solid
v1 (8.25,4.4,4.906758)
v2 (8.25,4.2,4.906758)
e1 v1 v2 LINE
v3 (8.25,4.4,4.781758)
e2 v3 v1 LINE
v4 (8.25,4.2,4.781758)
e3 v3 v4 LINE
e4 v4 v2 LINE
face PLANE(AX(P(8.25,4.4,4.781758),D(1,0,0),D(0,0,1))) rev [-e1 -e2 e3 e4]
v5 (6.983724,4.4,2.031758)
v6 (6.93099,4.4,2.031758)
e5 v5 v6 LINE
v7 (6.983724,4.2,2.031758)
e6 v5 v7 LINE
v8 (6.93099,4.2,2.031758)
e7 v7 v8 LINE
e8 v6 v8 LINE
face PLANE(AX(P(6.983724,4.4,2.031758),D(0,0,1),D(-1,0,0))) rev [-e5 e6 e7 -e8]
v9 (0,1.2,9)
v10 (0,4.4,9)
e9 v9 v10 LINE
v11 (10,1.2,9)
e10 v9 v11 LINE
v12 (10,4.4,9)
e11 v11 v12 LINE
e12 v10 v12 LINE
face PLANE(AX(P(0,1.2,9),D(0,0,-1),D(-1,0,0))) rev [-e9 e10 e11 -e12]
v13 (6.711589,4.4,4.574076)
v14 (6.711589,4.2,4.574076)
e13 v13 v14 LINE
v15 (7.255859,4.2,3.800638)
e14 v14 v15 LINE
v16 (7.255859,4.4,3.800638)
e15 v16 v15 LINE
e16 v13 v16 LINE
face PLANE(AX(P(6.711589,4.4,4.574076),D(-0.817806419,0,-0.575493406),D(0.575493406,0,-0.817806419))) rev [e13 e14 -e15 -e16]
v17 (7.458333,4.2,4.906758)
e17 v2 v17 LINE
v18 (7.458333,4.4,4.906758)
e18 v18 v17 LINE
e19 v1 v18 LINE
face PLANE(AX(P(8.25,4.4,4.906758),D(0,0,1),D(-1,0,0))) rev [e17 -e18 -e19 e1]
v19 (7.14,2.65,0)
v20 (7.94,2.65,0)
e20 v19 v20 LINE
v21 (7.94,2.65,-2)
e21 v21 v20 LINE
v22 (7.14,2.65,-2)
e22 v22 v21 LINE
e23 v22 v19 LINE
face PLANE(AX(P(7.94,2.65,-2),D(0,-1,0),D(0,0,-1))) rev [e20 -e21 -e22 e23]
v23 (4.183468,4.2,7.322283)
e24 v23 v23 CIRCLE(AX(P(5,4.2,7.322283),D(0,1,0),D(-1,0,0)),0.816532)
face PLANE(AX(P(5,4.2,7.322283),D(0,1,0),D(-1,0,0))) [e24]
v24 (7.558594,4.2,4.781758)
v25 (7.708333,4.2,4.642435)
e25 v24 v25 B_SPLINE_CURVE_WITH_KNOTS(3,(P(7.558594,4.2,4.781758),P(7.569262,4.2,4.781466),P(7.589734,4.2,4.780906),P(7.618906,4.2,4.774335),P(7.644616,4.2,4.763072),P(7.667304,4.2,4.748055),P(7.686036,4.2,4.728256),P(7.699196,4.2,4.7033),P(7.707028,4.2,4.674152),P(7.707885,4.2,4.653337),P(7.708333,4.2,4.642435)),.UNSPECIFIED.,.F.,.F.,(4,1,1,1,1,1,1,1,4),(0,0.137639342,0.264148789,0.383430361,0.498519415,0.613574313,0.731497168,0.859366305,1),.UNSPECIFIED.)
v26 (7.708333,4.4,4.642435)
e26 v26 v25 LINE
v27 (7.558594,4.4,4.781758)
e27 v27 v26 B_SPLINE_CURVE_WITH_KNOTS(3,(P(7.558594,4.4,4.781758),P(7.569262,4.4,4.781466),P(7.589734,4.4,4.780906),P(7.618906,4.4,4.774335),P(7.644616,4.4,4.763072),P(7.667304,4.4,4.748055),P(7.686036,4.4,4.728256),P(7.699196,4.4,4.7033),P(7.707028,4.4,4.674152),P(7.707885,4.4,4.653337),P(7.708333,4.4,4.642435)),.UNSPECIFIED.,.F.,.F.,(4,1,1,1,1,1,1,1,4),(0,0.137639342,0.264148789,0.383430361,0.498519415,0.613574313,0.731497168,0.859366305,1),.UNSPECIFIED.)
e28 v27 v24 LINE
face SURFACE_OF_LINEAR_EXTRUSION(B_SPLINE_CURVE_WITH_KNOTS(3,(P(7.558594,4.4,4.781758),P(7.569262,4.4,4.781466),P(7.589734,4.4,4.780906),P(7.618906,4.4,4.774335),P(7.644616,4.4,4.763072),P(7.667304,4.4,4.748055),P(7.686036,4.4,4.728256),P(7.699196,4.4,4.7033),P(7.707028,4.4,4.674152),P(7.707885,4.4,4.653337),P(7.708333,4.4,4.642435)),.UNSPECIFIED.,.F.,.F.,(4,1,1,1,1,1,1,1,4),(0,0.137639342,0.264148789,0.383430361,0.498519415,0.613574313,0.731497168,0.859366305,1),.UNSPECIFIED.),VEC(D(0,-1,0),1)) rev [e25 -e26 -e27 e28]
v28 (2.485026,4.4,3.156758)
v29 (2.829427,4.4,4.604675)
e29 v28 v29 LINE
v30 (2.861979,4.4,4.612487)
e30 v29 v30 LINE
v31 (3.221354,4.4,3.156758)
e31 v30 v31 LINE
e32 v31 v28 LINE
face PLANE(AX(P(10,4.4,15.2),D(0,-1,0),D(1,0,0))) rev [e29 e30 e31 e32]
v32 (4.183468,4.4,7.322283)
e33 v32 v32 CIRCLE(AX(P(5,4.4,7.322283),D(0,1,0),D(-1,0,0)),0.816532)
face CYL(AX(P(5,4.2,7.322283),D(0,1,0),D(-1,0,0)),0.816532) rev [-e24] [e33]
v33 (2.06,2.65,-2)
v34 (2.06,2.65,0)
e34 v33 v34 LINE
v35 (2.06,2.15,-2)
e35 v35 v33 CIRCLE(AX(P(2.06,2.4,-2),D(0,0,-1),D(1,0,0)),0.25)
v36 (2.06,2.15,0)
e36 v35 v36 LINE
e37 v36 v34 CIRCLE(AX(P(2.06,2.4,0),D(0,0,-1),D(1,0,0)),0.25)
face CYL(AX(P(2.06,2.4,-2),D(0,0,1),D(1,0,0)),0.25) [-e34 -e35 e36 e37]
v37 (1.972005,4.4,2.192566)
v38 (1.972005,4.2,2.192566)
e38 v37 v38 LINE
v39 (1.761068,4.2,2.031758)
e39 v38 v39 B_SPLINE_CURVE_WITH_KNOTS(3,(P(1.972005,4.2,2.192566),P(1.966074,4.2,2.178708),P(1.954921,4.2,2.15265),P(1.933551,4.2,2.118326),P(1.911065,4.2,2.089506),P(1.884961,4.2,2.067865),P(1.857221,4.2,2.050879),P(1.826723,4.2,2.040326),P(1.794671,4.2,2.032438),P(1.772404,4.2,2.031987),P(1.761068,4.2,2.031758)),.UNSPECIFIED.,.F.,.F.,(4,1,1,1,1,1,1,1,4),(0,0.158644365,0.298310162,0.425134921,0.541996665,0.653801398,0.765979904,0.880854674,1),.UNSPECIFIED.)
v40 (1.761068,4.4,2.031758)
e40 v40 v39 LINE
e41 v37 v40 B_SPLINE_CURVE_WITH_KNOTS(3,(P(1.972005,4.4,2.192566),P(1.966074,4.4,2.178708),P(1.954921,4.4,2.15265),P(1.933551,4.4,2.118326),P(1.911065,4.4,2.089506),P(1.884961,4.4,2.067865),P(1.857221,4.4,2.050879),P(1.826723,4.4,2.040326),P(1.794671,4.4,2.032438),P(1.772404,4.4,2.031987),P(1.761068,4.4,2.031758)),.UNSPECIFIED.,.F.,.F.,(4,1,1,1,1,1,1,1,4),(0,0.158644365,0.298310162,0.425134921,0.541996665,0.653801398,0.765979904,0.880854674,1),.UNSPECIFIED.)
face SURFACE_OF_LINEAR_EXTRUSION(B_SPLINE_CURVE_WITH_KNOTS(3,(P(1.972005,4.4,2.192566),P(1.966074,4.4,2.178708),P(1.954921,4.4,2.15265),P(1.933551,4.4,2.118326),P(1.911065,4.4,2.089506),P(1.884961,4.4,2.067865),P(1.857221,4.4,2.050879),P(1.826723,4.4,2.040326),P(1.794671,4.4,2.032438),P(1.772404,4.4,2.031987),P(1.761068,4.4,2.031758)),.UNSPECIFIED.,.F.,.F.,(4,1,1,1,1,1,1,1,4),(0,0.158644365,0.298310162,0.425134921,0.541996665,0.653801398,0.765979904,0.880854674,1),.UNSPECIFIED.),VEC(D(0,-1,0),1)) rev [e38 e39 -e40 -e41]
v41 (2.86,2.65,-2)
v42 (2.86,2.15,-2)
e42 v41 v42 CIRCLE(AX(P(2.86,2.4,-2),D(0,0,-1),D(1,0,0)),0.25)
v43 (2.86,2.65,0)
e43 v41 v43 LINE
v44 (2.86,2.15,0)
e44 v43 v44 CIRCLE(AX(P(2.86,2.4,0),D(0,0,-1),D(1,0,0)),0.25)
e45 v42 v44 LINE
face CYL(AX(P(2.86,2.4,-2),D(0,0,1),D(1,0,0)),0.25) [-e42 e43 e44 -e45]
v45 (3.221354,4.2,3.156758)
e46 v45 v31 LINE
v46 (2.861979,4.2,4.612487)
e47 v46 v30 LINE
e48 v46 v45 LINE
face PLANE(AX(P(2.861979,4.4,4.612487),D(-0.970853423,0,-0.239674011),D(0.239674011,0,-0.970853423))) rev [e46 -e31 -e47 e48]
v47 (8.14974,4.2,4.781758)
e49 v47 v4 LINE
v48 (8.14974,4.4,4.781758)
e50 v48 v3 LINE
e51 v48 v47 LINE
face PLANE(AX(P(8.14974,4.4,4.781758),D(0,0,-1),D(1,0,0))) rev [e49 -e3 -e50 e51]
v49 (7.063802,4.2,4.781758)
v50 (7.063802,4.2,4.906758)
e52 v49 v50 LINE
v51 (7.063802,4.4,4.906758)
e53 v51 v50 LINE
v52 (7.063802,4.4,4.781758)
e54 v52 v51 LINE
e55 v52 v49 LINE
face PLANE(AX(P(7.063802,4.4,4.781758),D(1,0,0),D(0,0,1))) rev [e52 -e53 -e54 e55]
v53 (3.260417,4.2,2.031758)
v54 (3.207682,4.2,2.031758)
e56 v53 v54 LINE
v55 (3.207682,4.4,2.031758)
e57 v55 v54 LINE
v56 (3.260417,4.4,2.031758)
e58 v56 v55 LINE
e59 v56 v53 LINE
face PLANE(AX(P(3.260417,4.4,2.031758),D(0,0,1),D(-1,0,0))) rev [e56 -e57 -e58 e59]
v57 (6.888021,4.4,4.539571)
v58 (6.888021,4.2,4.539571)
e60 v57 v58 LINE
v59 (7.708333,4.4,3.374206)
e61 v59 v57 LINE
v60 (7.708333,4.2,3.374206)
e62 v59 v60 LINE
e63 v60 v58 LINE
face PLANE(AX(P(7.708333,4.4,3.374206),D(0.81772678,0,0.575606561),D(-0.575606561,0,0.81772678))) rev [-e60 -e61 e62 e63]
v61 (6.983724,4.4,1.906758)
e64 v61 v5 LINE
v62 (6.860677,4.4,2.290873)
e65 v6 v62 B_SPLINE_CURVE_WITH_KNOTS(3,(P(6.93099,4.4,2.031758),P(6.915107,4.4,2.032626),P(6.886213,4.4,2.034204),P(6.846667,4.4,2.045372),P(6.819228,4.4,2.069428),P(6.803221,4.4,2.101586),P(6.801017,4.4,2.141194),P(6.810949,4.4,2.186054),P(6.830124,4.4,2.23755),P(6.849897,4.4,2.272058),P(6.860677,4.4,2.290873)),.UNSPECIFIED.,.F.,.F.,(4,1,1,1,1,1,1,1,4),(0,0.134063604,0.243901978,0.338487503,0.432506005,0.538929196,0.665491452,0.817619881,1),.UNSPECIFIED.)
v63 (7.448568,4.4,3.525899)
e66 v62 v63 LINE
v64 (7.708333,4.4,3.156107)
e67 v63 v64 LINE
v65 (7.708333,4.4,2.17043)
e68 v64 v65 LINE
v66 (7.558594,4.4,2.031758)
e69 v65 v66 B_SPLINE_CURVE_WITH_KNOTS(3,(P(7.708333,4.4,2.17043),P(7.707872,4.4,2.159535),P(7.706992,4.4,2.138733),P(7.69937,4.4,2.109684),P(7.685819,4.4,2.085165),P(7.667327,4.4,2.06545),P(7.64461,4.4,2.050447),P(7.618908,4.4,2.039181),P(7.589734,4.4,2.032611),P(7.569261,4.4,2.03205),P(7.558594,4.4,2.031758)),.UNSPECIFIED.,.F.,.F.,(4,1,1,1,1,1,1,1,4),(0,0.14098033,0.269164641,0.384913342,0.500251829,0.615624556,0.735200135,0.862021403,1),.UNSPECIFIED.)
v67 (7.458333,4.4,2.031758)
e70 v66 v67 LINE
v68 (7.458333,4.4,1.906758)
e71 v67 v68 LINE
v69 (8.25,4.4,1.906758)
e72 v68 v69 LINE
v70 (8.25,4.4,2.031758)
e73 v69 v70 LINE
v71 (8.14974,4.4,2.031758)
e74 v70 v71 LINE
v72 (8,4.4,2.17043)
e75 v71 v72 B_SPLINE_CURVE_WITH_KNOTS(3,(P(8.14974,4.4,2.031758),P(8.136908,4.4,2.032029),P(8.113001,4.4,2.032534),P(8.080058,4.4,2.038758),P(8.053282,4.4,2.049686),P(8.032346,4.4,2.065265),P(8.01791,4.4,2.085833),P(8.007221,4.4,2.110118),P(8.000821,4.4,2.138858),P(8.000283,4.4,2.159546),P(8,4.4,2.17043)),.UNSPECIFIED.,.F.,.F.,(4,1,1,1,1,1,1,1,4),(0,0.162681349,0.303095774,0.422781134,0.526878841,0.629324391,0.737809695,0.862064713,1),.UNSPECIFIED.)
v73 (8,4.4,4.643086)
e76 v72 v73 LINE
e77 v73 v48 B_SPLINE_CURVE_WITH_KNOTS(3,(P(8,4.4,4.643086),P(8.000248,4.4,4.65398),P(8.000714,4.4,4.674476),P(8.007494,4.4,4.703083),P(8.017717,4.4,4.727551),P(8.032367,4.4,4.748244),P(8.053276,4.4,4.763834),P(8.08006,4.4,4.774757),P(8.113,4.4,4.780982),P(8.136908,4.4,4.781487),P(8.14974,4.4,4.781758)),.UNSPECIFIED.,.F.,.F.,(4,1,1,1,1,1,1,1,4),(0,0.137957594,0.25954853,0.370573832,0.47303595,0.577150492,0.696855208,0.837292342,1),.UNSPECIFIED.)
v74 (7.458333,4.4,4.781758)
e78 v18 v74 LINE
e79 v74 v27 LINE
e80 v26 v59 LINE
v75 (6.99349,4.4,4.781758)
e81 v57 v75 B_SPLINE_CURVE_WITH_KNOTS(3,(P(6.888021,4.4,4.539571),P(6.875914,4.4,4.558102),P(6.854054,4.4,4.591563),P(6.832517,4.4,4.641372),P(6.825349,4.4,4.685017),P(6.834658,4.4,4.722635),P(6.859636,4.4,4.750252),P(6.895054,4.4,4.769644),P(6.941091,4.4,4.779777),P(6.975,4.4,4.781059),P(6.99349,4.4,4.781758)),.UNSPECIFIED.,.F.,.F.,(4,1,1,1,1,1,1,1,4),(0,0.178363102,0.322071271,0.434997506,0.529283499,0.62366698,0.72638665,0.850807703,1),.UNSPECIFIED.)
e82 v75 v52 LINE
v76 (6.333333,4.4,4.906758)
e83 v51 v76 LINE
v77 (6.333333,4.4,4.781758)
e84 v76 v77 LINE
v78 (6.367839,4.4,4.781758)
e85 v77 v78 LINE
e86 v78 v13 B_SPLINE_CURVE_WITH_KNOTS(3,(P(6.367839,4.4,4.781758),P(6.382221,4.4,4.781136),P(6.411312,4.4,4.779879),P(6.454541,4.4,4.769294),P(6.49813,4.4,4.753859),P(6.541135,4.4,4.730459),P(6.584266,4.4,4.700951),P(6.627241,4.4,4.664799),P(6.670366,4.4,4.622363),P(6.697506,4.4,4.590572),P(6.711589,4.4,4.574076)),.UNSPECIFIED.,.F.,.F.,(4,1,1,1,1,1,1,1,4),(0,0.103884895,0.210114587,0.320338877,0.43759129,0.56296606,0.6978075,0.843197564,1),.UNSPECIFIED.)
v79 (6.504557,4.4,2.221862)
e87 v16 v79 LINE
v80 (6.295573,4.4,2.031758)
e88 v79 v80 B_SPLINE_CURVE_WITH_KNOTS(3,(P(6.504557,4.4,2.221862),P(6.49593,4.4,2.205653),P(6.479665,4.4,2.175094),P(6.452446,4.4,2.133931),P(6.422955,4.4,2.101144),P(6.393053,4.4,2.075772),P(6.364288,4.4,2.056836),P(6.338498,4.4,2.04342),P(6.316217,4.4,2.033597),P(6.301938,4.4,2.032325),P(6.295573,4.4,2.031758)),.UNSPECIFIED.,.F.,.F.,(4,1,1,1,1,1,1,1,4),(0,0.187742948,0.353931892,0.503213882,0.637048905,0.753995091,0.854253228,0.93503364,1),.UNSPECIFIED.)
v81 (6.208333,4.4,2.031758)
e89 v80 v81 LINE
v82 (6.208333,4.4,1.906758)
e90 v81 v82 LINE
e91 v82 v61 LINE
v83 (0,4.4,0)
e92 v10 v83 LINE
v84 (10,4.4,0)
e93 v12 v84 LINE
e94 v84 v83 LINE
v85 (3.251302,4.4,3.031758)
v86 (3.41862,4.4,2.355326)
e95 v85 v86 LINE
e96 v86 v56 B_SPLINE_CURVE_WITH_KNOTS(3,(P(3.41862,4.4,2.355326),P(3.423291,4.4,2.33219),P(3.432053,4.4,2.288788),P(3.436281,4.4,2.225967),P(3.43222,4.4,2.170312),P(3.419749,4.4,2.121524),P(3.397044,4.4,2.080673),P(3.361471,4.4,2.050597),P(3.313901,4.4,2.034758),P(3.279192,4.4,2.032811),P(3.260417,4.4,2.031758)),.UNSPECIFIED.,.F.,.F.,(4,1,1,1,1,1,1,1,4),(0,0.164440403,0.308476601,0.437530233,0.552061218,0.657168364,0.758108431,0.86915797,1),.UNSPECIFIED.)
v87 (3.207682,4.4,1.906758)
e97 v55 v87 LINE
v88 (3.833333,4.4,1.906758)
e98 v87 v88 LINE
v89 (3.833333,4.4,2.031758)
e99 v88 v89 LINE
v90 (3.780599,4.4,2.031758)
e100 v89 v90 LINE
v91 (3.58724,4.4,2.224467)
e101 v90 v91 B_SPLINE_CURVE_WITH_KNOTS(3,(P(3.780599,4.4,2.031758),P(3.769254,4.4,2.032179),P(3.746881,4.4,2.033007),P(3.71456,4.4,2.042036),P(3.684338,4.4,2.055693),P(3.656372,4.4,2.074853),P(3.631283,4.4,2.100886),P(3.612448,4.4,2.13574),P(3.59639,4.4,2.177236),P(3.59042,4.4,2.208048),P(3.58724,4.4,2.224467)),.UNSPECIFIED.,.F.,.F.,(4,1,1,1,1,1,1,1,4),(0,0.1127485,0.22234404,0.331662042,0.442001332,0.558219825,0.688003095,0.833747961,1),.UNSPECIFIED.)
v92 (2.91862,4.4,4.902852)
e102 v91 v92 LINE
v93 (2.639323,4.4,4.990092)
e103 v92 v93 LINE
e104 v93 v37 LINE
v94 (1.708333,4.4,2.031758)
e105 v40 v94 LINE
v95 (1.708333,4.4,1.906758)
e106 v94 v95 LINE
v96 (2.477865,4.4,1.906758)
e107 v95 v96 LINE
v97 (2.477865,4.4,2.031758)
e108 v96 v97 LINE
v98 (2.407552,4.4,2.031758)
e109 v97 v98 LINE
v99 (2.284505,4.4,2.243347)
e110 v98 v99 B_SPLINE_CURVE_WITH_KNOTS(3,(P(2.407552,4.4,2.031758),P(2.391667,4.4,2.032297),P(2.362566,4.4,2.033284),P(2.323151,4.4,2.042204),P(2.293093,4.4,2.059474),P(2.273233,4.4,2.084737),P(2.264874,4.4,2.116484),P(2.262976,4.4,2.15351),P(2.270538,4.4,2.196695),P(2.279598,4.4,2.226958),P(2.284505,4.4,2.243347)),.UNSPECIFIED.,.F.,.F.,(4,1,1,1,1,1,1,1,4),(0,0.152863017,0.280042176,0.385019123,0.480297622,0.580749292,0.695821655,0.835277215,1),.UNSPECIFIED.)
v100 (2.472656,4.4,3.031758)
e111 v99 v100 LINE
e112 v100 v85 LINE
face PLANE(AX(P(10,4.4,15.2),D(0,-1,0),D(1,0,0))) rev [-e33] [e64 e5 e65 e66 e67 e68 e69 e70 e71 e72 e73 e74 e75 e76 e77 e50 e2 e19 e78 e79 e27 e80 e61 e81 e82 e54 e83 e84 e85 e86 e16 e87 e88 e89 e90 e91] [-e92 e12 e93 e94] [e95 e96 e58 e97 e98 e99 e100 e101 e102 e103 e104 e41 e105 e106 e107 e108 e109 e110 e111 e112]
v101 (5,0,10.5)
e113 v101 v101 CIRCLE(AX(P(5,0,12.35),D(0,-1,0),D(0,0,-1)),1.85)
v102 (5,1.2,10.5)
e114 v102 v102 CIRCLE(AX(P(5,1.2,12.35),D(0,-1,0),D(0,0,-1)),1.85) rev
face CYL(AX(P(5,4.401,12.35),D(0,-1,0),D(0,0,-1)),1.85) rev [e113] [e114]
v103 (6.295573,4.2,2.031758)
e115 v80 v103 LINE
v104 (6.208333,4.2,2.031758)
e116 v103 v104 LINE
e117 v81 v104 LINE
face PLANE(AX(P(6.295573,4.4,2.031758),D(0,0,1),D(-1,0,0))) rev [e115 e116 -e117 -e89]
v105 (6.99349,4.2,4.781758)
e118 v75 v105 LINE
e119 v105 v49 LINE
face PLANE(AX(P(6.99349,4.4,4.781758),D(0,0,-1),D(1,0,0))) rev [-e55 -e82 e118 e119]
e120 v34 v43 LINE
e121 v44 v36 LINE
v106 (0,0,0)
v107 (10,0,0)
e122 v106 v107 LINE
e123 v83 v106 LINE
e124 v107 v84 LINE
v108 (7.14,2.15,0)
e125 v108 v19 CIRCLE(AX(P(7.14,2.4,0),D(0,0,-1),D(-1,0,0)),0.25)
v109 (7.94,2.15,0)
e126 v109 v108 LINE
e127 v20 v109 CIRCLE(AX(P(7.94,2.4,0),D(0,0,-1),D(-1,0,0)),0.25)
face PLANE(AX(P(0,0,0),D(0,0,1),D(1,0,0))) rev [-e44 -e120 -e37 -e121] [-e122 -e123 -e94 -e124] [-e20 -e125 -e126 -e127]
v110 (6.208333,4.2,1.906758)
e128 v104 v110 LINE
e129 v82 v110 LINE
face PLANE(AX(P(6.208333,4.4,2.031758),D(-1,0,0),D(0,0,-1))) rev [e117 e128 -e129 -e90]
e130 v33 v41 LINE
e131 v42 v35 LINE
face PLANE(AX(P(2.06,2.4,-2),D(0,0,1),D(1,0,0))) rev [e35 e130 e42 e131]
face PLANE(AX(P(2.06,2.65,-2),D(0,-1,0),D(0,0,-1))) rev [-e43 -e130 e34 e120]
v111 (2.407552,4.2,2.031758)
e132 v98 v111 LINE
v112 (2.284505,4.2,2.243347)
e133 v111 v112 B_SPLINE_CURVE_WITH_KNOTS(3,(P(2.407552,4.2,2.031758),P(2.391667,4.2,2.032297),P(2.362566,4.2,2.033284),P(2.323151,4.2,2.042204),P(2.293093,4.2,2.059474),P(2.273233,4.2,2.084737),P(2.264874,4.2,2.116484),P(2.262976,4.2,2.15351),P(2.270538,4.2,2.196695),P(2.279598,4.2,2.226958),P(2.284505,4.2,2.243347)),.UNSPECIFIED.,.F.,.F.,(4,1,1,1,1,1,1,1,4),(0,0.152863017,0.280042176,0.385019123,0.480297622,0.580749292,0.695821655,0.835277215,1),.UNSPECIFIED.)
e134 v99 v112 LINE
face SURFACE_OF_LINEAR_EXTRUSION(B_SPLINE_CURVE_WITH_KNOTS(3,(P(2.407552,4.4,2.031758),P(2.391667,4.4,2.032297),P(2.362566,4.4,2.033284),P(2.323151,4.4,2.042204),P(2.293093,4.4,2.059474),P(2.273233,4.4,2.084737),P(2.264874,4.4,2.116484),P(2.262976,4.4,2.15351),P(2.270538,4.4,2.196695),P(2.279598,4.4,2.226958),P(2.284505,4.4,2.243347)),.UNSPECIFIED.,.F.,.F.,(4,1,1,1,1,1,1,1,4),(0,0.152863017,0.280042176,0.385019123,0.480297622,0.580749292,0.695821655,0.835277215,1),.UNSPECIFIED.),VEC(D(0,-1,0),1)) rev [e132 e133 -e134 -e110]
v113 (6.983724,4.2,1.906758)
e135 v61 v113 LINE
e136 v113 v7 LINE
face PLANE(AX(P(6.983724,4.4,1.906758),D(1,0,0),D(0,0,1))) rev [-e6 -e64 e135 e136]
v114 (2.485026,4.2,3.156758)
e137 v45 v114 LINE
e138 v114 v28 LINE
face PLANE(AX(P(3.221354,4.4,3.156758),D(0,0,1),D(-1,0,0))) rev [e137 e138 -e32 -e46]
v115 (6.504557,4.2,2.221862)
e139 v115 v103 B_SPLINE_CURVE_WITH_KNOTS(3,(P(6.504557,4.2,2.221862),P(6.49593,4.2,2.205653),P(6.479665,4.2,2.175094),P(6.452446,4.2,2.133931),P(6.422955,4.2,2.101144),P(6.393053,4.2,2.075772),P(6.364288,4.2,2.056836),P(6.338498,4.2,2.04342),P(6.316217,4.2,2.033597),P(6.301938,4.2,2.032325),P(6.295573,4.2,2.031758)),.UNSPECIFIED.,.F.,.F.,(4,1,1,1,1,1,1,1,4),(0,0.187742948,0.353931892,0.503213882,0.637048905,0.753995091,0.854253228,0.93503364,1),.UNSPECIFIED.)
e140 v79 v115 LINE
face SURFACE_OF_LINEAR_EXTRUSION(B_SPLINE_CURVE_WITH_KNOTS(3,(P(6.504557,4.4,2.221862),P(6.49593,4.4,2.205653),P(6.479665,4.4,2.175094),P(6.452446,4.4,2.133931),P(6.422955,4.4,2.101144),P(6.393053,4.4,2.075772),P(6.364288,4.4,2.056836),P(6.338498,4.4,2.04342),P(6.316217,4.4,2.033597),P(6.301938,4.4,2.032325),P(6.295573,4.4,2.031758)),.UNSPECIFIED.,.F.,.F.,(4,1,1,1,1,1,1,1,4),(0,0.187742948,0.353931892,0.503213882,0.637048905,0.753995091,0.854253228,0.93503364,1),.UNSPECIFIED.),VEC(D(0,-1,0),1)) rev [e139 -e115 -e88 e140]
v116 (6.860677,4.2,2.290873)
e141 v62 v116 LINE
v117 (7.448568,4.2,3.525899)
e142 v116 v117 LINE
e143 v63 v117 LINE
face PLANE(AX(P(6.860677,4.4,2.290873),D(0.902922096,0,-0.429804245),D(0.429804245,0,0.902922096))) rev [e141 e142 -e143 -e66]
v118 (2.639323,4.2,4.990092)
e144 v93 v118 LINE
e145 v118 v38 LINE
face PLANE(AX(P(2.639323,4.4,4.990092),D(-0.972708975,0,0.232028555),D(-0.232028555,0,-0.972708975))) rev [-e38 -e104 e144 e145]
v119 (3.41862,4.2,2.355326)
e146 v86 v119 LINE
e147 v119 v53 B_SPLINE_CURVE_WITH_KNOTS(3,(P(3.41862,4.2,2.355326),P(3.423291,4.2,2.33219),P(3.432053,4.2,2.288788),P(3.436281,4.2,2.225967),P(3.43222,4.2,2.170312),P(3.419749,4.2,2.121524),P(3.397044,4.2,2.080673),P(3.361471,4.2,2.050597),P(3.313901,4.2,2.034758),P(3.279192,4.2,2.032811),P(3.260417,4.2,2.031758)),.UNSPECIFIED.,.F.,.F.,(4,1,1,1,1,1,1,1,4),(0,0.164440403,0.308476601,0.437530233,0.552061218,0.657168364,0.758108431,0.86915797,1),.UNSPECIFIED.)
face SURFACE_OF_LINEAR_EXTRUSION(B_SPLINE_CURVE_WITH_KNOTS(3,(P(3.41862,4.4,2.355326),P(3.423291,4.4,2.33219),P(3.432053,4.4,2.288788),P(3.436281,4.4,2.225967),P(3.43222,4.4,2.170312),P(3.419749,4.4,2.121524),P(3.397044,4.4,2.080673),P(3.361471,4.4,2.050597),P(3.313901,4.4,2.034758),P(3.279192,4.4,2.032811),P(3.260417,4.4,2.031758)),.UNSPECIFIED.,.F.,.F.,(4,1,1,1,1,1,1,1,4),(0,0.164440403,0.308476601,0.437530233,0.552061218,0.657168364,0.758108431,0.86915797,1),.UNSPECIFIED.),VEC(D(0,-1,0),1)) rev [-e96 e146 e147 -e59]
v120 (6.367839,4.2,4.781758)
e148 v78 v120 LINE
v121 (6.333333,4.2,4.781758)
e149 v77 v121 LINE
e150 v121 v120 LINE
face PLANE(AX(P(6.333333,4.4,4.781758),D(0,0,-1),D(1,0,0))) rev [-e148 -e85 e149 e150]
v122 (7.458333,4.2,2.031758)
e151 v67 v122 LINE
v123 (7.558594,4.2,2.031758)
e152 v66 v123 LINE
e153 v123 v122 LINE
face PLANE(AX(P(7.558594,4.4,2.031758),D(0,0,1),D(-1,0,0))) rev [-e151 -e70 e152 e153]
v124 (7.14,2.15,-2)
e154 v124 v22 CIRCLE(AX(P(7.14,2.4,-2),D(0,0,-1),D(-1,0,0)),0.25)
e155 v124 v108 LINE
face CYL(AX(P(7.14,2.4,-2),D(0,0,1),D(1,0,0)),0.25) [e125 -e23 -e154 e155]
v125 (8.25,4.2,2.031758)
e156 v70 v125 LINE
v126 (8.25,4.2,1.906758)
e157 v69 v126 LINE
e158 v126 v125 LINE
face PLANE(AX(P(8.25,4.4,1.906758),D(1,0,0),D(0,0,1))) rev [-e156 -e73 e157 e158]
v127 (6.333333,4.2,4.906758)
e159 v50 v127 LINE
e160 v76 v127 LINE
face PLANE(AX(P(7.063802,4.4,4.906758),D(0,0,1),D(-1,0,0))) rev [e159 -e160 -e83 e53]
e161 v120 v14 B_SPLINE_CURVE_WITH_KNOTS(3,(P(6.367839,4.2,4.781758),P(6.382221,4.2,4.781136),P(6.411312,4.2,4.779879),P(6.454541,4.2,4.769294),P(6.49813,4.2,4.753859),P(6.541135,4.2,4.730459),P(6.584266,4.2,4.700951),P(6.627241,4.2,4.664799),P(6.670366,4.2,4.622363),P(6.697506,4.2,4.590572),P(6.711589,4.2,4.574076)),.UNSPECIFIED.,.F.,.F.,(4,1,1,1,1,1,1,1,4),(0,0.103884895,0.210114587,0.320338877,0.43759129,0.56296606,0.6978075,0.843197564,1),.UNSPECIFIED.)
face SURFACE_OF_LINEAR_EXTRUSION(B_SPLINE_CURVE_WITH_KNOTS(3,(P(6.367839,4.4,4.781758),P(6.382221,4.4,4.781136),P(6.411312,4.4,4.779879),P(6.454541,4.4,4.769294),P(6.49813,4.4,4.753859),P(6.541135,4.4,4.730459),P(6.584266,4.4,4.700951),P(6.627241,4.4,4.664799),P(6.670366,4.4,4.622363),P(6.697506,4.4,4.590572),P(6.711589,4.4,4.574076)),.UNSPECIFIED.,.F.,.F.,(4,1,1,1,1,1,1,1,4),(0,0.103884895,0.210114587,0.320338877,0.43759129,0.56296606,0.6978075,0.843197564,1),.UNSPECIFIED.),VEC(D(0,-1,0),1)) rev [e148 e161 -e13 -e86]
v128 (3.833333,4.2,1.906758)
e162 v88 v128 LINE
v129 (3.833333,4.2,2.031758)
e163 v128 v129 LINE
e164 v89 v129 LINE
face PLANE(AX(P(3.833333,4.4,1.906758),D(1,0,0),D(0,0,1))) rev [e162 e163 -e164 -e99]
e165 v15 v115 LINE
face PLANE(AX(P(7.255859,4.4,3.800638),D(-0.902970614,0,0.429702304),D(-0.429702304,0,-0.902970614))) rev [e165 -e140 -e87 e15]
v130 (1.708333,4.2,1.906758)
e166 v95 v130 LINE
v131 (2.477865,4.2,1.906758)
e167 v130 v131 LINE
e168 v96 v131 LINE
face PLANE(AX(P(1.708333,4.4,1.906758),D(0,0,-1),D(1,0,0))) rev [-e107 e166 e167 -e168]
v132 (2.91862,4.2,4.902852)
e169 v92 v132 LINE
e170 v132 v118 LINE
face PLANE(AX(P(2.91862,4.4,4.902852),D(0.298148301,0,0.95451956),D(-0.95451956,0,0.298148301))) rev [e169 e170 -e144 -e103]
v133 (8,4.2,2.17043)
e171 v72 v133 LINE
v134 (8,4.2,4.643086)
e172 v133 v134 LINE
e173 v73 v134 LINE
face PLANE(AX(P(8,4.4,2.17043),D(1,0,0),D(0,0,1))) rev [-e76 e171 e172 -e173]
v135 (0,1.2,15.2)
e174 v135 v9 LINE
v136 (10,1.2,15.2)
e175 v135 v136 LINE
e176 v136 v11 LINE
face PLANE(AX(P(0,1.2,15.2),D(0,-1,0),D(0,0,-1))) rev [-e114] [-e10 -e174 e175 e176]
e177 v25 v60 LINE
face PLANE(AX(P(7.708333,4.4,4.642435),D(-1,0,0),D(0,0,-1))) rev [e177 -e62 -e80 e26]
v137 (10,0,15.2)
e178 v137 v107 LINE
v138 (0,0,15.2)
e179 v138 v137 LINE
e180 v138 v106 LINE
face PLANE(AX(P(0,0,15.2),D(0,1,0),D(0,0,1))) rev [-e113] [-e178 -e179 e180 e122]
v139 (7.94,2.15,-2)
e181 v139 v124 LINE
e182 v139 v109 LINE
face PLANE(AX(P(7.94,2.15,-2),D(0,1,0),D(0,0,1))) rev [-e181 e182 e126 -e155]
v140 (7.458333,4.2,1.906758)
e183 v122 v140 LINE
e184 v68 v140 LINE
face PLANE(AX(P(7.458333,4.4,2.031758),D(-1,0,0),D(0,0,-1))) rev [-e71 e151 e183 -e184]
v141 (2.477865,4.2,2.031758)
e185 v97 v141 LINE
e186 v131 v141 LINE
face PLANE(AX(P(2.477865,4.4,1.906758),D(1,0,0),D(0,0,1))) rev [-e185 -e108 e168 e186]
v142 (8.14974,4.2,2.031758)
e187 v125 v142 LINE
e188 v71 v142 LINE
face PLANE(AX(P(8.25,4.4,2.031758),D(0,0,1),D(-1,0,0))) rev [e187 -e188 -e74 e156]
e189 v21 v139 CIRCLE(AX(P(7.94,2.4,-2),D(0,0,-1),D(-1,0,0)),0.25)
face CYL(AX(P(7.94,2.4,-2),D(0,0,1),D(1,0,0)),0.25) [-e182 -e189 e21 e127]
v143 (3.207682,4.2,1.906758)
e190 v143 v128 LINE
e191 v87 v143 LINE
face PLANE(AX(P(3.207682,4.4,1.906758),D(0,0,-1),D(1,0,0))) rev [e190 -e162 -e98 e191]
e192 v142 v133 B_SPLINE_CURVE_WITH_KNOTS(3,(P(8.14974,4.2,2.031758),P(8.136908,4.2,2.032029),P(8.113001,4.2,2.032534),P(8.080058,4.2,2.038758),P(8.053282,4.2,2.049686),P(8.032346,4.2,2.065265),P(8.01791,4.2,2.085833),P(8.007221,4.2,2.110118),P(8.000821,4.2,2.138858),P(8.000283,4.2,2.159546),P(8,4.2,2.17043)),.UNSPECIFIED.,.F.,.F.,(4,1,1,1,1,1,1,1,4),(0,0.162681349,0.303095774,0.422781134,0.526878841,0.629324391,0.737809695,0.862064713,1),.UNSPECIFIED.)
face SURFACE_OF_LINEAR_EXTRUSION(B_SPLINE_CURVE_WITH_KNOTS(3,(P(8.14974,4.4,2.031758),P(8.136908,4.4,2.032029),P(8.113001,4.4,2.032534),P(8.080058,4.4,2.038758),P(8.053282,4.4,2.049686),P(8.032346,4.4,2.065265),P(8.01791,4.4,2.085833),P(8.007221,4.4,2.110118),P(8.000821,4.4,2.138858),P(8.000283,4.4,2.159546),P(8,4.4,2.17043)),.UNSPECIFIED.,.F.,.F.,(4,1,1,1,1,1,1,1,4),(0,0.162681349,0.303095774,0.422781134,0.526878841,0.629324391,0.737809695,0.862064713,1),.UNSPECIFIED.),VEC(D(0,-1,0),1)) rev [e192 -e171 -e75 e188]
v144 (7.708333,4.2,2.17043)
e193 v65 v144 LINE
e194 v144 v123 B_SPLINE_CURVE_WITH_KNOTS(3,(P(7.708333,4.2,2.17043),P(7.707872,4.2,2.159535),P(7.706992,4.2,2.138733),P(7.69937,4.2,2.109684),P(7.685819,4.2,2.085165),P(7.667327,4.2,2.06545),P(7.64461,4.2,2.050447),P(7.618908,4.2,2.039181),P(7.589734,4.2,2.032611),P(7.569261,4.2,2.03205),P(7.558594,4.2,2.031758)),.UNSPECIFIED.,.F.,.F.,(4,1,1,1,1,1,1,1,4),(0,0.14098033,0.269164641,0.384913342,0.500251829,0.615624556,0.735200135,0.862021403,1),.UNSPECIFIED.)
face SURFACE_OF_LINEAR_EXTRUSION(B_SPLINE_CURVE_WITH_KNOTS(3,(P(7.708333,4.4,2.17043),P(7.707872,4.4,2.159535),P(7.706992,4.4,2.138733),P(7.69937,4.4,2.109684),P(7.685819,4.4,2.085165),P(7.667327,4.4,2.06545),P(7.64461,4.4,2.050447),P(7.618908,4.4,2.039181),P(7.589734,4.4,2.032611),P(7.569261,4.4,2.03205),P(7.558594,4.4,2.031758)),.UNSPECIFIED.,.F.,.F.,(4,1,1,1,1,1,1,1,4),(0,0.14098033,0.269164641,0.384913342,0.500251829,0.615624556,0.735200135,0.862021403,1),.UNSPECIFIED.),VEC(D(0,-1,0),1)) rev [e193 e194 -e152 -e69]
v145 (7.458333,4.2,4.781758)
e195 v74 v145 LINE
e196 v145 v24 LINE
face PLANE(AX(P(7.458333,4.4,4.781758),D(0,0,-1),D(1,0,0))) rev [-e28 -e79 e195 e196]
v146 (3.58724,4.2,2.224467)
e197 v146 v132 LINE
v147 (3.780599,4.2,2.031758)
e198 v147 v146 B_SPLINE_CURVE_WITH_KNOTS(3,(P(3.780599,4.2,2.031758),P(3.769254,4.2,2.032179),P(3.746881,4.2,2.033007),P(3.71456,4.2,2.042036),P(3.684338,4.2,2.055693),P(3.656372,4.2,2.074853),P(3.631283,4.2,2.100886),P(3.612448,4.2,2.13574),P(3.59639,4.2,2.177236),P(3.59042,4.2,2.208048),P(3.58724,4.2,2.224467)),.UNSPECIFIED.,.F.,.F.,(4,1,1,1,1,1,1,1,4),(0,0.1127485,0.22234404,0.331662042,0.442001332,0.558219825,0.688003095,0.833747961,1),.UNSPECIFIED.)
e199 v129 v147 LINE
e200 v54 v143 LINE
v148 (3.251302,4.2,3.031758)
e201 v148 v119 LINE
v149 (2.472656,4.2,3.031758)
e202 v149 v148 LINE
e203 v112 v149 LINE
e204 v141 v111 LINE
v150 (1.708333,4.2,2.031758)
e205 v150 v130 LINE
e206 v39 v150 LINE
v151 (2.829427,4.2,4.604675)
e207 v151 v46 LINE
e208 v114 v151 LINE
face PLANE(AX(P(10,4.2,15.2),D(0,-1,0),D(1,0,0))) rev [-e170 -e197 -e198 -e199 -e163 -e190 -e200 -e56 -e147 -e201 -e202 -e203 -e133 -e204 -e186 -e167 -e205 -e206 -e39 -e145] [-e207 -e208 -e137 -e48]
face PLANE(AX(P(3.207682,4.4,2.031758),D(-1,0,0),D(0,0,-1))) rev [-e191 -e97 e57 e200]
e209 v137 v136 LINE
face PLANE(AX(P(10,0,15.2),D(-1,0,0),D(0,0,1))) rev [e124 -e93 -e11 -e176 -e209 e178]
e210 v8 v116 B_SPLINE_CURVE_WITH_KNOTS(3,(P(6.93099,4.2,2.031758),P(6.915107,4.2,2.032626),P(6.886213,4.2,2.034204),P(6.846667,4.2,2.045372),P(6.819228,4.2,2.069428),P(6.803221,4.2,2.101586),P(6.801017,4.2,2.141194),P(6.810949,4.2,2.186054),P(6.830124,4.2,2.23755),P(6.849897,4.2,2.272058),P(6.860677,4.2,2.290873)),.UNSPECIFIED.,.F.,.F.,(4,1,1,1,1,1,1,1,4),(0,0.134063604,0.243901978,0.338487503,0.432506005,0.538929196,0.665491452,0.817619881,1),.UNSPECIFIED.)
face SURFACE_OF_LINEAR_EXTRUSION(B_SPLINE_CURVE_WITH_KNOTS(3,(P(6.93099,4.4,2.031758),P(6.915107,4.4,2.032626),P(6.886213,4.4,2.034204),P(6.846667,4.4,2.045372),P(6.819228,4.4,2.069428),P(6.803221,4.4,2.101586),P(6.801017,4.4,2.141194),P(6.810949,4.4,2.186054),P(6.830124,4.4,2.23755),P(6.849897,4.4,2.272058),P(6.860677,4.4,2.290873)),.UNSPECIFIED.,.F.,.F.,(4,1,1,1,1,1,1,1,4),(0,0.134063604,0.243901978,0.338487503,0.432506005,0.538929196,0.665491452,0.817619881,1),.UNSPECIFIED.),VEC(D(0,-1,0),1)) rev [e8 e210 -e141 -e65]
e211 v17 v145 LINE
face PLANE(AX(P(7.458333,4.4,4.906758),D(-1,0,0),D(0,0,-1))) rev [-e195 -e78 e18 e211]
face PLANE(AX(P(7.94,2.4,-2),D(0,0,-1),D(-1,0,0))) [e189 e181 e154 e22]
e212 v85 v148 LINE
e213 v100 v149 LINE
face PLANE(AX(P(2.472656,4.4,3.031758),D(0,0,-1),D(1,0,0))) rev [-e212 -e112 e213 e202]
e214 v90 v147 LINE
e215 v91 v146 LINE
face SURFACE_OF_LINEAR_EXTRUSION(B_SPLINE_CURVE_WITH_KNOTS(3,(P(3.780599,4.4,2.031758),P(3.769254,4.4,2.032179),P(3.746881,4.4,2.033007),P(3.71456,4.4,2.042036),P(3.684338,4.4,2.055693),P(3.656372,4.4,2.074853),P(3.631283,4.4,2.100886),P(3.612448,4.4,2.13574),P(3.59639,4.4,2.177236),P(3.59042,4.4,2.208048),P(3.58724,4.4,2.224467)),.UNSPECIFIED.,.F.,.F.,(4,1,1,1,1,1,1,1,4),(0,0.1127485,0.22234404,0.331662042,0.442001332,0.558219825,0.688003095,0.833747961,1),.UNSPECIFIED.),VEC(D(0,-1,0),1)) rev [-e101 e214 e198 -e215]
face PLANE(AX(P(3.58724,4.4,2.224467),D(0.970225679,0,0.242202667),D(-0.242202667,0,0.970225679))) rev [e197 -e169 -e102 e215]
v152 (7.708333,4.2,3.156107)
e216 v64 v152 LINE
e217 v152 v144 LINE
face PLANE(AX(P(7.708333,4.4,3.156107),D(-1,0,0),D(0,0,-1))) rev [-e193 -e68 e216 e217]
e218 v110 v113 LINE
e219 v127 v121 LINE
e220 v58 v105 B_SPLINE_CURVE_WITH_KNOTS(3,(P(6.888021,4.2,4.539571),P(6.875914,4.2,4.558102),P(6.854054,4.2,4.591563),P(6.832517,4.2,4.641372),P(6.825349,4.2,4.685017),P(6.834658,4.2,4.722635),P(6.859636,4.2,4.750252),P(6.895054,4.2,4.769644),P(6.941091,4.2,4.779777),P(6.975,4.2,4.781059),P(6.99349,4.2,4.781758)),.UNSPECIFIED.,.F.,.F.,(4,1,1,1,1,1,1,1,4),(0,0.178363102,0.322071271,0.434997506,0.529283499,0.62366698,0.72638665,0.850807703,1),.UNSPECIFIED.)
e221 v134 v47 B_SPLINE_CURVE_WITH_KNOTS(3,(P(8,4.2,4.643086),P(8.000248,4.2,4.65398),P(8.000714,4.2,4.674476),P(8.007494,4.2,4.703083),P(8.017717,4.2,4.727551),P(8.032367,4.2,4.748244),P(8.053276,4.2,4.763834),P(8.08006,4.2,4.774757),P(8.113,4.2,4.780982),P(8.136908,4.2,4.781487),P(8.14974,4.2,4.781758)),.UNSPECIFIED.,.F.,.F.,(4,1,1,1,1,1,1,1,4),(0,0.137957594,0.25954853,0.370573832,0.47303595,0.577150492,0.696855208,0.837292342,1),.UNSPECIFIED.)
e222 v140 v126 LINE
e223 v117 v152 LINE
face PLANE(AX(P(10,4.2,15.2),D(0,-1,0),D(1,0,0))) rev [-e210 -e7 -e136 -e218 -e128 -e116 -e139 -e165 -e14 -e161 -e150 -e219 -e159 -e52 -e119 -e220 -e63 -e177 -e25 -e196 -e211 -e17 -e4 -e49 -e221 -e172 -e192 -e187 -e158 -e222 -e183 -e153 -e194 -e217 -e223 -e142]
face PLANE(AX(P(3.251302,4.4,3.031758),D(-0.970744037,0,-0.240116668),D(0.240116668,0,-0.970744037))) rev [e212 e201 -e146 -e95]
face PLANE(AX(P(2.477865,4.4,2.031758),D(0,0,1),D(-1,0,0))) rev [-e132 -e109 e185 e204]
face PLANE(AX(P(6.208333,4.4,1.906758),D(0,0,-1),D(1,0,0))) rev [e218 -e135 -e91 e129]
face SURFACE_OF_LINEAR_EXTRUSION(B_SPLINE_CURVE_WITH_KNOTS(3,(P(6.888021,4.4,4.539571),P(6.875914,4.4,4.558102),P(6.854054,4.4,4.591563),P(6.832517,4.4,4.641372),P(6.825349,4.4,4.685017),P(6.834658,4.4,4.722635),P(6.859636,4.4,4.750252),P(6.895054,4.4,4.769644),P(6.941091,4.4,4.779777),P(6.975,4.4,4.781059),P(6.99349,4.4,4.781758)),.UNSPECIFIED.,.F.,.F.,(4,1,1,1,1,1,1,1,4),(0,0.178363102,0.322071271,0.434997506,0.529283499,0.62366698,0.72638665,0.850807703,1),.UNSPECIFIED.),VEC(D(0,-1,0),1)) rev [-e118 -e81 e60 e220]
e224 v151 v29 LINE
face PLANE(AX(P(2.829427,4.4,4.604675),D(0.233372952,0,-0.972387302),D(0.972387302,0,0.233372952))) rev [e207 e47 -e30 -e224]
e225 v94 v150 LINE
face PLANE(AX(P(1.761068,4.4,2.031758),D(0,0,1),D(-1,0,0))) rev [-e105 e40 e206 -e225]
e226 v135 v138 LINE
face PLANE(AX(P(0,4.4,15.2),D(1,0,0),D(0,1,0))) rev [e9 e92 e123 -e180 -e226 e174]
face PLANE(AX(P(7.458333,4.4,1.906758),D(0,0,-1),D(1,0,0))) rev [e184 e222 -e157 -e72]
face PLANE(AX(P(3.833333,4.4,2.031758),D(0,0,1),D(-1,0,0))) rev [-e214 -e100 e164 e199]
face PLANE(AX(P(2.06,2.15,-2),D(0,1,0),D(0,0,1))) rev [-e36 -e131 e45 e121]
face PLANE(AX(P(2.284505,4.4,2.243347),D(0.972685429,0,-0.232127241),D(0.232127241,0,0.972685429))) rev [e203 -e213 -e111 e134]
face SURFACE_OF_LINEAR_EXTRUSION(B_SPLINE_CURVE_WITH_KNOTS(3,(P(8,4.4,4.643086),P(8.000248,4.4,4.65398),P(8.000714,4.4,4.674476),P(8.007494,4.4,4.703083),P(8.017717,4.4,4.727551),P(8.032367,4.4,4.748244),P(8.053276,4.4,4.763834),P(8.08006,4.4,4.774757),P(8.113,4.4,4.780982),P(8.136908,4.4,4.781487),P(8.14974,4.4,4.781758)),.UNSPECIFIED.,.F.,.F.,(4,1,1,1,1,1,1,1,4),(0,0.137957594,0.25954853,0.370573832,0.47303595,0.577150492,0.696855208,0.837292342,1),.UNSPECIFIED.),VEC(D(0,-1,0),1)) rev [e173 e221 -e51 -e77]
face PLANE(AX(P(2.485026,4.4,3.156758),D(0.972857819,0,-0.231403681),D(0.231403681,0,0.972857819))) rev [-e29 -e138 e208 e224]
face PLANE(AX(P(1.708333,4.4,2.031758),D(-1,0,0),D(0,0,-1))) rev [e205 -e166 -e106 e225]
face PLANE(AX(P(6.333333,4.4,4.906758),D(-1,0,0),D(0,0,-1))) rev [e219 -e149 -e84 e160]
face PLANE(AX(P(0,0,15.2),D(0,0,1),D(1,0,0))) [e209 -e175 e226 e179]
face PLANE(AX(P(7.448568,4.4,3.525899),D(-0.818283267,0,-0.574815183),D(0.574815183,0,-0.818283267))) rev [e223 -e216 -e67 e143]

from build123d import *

# Parameters (mm, degrees)
SKETCH_1_W          = 10
SKETCH_1_H          = 4.4
EXTRUDE_1_DEPTH     = 15.2
SKETCH_2_W          = 6.2
SKETCH_2_H          = 3.2
CUT_EXTRUDE_1_DEPTH = 19.718974331
CUT_EXTRUDE_2_REACH = 20.719
SKETCH_3_R          = 1.85
SKETCH_4_R          = 0.816532351
CUT_EXTRUDE_3_DEPTH = 0.2
EXTRUDE_2_DEPTH     = 2
WRAP_START          = -0.2
WRAP_1_DEPTH        = 0.2


# Read off the part's stored shape, not the designer's step: 包覆1
with BuildPart() as part:
    # 草图1 → 凸台-拉伸1 (new body)
    with BuildSketch(Plane.XY):
        with Locations((5, 2.2)):
            Rectangle(SKETCH_1_W, SKETCH_1_H)
    extrude(amount=EXTRUDE_1_DEPTH)

    # 草图2 → 切除-拉伸1 (cut, through all)
    with BuildSketch(Plane(origin=(10, 0, 0), x_dir=(0, 0, -1), z_dir=(1, 0, 0))):
        with Locations((-12.1, 2.8)):
            Rectangle(SKETCH_2_W, SKETCH_2_H)
    extrude(amount=-CUT_EXTRUDE_1_DEPTH, mode=Mode.SUBTRACT)

    # 草图3 → 切除-拉伸2 (cut, up to next)
    with BuildSketch(Plane.XZ, mode=Mode.PRIVATE) as cut_extrude_2_sk1:
        with Locations(Location((5, 12.35, 0), (0, 0, 270))):
            Circle(SKETCH_3_R)
    cut_extrude_2_tool1 = extrude(cut_extrude_2_sk1.sketch, amount=-CUT_EXTRUDE_2_REACH, mode=Mode.PRIVATE) & part.part
    add(cut_extrude_2_tool1.solids().sort_by_distance((5, 0, 12.35))[0], mode=Mode.SUBTRACT)

    # 草图4 → 切除-拉伸3 (cut)
    with BuildSketch(Plane(origin=(0, 4.4, 0), x_dir=(-1, 0, 0), z_dir=(0, 1, 0))):
        with Locations((-5, 7.32228291)):
            Circle(SKETCH_4_R)
    extrude(amount=-CUT_EXTRUDE_3_DEPTH, mode=Mode.SUBTRACT)

    # 草图5 → 凸台-拉伸2 (add)
    with BuildSketch(Plane(origin=(0, 0, 0), x_dir=(-1, 0, 0), z_dir=(0, 0, -1))):
        with BuildLine():
            Line((-7.94, 2.65), (-7.14, 2.65))
            ThreePointArc((-7.14, 2.65), (-6.89, 2.4), (-7.14, 2.15))
            Line((-7.14, 2.15), (-7.94, 2.15))
            ThreePointArc((-7.94, 2.15), (-8.19, 2.4), (-7.94, 2.65))
        make_face()
        with BuildLine():
            Line((-2.06, 2.65), (-2.86, 2.65))
            ThreePointArc((-2.86, 2.65), (-3.11, 2.4), (-2.86, 2.15))
            Line((-2.86, 2.15), (-2.06, 2.15))
            ThreePointArc((-2.06, 2.15), (-1.81, 2.4), (-2.06, 2.65))
        make_face()
    extrude(amount=EXTRUDE_2_DEPTH)

    # 包覆1 outline → 包覆1 (cut)
    # profile 1 of 2: a face of its own
    with BuildSketch(Plane(origin=(0, 4.4, 0), x_dir=(1, 0, 0), z_dir=(0, 1, 0)).offset(WRAP_START)):
        with BuildLine():
            add(Edge.make_bspline(
                [(6.930989583, -2.031758229), (6.915107326, -2.032625879), (6.886212727, -2.034204394), (6.846667333, -2.045372179), (6.819228063, -2.069428088), (6.803221049, -2.101586149), (6.801017387, -2.141193863), (6.810949266, -2.186053613), (6.830123901, -2.237549844), (6.849896632, -2.272058221), (6.860677083, -2.290872813)],
                knots=[0, 0, 0, 0, 0.134063604, 0.243901978, 0.338487503, 0.432506005, 0.538929196, 0.665491452, 0.817619881, 1, 1, 1, 1], degree=3))
            Line((6.930989583, -2.031758229), (6.983723958, -2.031758229))
            Line((6.983723958, -2.031758229), (6.983723958, -1.906758229))
            Line((6.983723958, -1.906758229), (6.208333333, -1.906758229))
            Line((6.208333333, -1.906758229), (6.208333333, -2.031758229))
            Line((6.208333333, -2.031758229), (6.295572917, -2.031758229))
            add(Edge.make_bspline(
                [(6.504557292, -2.221862396), (6.495929833, -2.205652704), (6.479665398, -2.175094288), (6.45244636, -2.133930793), (6.422954526, -2.101143884), (6.393052529, -2.075772209), (6.364287696, -2.056836396), (6.33849766, -2.04342026), (6.316216749, -2.033596626), (6.301937753, -2.032325038), (6.295572917, -2.031758229)],
                knots=[0, 0, 0, 0, 0.187742948, 0.353931892, 0.503213882, 0.637048905, 0.753995091, 0.854253228, 0.93503364, 1, 1, 1, 1], degree=3))
            Line((6.504557292, -2.221862396), (7.255859375, -3.800638438))
            Line((7.255859375, -3.800638438), (6.711588542, -4.574075938))
            add(Edge.make_bspline(
                [(6.367838542, -4.781758229), (6.382221439, -4.781136361), (6.411311872, -4.779878589), (6.454540631, -4.769294334), (6.498129706, -4.753858707), (6.541134976, -4.730459287), (6.584266179, -4.700950899), (6.627240555, -4.66479857), (6.670366285, -4.622362568), (6.697506142, -4.590571678), (6.711588542, -4.574075938)],
                knots=[0, 0, 0, 0, 0.103884895, 0.210114587, 0.320338877, 0.43759129, 0.56296606, 0.6978075, 0.843197564, 1, 1, 1, 1], degree=3))
            Line((6.367838542, -4.781758229), (6.333333333, -4.781758229))
            Line((6.333333333, -4.781758229), (6.333333333, -4.906758229))
            Line((6.333333333, -4.906758229), (7.063802083, -4.906758229))
            Line((7.063802083, -4.906758229), (7.063802083, -4.781758229))
            Line((7.063802083, -4.781758229), (6.993489583, -4.781758229))
            add(Edge.make_bspline(
                [(6.888020833, -4.539570729), (6.875914449, -4.558101633), (6.854053882, -4.591562992), (6.832516724, -4.641371555), (6.825349297, -4.68501694), (6.834657735, -4.72263487), (6.859636327, -4.75025169), (6.89505428, -4.769644136), (6.941090575, -4.779777335), (6.974999933, -4.781059246), (6.993489583, -4.781758229)],
                knots=[0, 0, 0, 0, 0.178363102, 0.322071271, 0.434997506, 0.529283499, 0.62366698, 0.72638665, 0.850807703, 1, 1, 1, 1], degree=3))
            Line((6.888020833, -4.539570729), (7.708333333, -3.374206146))
            Line((7.708333333, -3.374206146), (7.708333333, -4.642435313))
            add(Edge.make_bspline(
                [(7.55859375, -4.781758229), (7.569261505, -4.781466132), (7.589734391, -4.780905556), (7.618905697, -4.774334821), (7.644615767, -4.763072355), (7.667304115, -4.748054599), (7.686035697, -4.728256372), (7.69919622, -4.703300066), (7.707027639, -4.674151855), (7.707884523, -4.653337332), (7.708333333, -4.642435313)],
                knots=[0, 0, 0, 0, 0.137639342, 0.264148789, 0.383430361, 0.498519415, 0.613574313, 0.731497168, 0.859366305, 1, 1, 1, 1], degree=3))
            Line((7.55859375, -4.781758229), (7.458333333, -4.781758229))
            Line((7.458333333, -4.781758229), (7.458333333, -4.906758229))
            Line((7.458333333, -4.906758229), (8.25, -4.906758229))
            Line((8.25, -4.906758229), (8.25, -4.781758229))
            Line((8.25, -4.781758229), (8.149739583, -4.781758229))
            add(Edge.make_bspline(
                [(8, -4.643086354), (8.000247716, -4.65398027), (8.000713759, -4.674475698), (8.007493922, -4.70308304), (8.017717416, -4.727550741), (8.032366625, -4.748243586), (8.05327597, -4.763833527), (8.080059672, -4.774757464), (8.113000414, -4.780982371), (8.136907743, -4.781487246), (8.149739583, -4.781758229)],
                knots=[0, 0, 0, 0, 0.137957594, 0.25954853, 0.370573832, 0.47303595, 0.577150492, 0.696855208, 0.837292342, 1, 1, 1, 1], degree=3))
            Line((8, -4.643086354), (8, -2.170430104))
            add(Edge.make_bspline(
                [(8.149739583, -2.031758229), (8.136907977, -2.032029309), (8.113001084, -2.032534363), (8.080057551, -2.038758127), (8.053282295, -2.049685522), (8.032346439, -2.065264608), (8.017909992, -2.085832582), (8.007221233, -2.110117779), (8.000820991, -2.138857995), (8.00028302, -2.159546252), (8, -2.170430104)],
                knots=[0, 0, 0, 0, 0.162681349, 0.303095774, 0.422781134, 0.526878841, 0.629324391, 0.737809695, 0.862064713, 1, 1, 1, 1], degree=3))
            Line((8.149739583, -2.031758229), (8.25, -2.031758229))
            Line((8.25, -2.031758229), (8.25, -1.906758229))
            Line((8.25, -1.906758229), (7.458333333, -1.906758229))
            Line((7.458333333, -1.906758229), (7.458333333, -2.031758229))
            Line((7.458333333, -2.031758229), (7.55859375, -2.031758229))
            add(Edge.make_bspline(
                [(7.708333333, -2.170430104), (7.707872164, -2.159534741), (7.706991684, -2.138732927), (7.699369622, -2.109684264), (7.685819191, -2.085165103), (7.667326615, -2.065449868), (7.644609508, -2.05044744), (7.618907501, -2.039180676), (7.589733882, -2.032611175), (7.569261331, -2.03205042), (7.55859375, -2.031758229)],
                knots=[0, 0, 0, 0, 0.14098033, 0.269164641, 0.384913342, 0.500251829, 0.615624556, 0.735200135, 0.862021403, 1, 1, 1, 1], degree=3))
            Line((7.708333333, -2.170430104), (7.708333333, -3.156107188))
            Line((7.708333333, -3.156107188), (7.448567708, -3.525898854))
            Line((7.448567708, -3.525898854), (6.860677083, -2.290872813))
        make_face()
    # profile 2 of 2: a face of its own
    with BuildSketch(Plane(origin=(0, 4.4, 0), x_dir=(1, 0, 0), z_dir=(0, 1, 0)).offset(WRAP_START)):
        with BuildLine():
            add(Edge.make_bspline(
                [(3.418619792, -2.355325938), (3.423290626, -2.332189778), (3.432052726, -2.288788256), (3.436281258, -2.225966665), (3.432219716, -2.170311627), (3.419748545, -2.121523718), (3.397043855, -2.080672541), (3.361471203, -2.050596509), (3.313901494, -2.03475832), (3.27919164, -2.032811362), (3.260416667, -2.031758229)],
                knots=[0, 0, 0, 0, 0.164440403, 0.308476601, 0.437530233, 0.552061218, 0.657168364, 0.758108431, 0.86915797, 1, 1, 1, 1], degree=3))
            Line((3.418619792, -2.355325938), (3.251302083, -3.031758229))
            Line((3.251302083, -3.031758229), (2.47265625, -3.031758229))
            Line((2.47265625, -3.031758229), (2.284505208, -2.243346771))
            add(Edge.make_bspline(
                [(2.407552083, -2.031758229), (2.391667135, -2.032296875), (2.362566209, -2.033283664), (2.3231508, -2.042204366), (2.293092672, -2.059473632), (2.273233438, -2.084737484), (2.26487379, -2.11648377), (2.262976163, -2.153509682), (2.270537673, -2.196694946), (2.279598478, -2.226958202), (2.284505208, -2.243346771)],
                knots=[0, 0, 0, 0, 0.152863017, 0.280042176, 0.385019123, 0.480297622, 0.580749292, 0.695821655, 0.835277215, 1, 1, 1, 1], degree=3))
            Line((2.407552083, -2.031758229), (2.477864583, -2.031758229))
            Line((2.477864583, -2.031758229), (2.477864583, -1.906758229))
            Line((2.477864583, -1.906758229), (1.708333333, -1.906758229))
            Line((1.708333333, -1.906758229), (1.708333333, -2.031758229))
            Line((1.708333333, -2.031758229), (1.761067708, -2.031758229))
            add(Edge.make_bspline(
                [(1.972005208, -2.192565521), (1.966073989, -2.178707602), (1.9549211, -2.152649581), (1.933551487, -2.118325589), (1.911064572, -2.089505922), (1.884961055, -2.067865098), (1.857221348, -2.050878644), (1.826723244, -2.040325548), (1.794671237, -2.032437792), (1.772404332, -2.031987489), (1.761067708, -2.031758229)],
                knots=[0, 0, 0, 0, 0.158644365, 0.298310162, 0.425134921, 0.541996665, 0.653801398, 0.765979904, 0.880854674, 1, 1, 1, 1], degree=3))
            Line((1.972005208, -2.192565521), (2.639322917, -4.990091563))
            Line((2.639322917, -4.990091563), (2.918619792, -4.902851979))
            Line((2.918619792, -4.902851979), (3.587239583, -2.224466563))
            add(Edge.make_bspline(
                [(3.780598958, -2.031758229), (3.769253734, -2.032178513), (3.74688055, -2.033007326), (3.714560239, -2.042036162), (3.684338324, -2.05569344), (3.656371612, -2.074852871), (3.631282534, -2.10088588), (3.612447742, -2.135739762), (3.596389822, -2.177235982), (3.590420449, -2.208047958), (3.587239583, -2.224466563)],
                knots=[0, 0, 0, 0, 0.1127485, 0.22234404, 0.331662042, 0.442001332, 0.558219825, 0.688003095, 0.833747961, 1, 1, 1, 1], degree=3))
            Line((3.780598958, -2.031758229), (3.833333333, -2.031758229))
            Line((3.833333333, -2.031758229), (3.833333333, -1.906758229))
            Line((3.833333333, -1.906758229), (3.207682292, -1.906758229))
            Line((3.207682292, -1.906758229), (3.207682292, -2.031758229))
            Line((3.207682292, -2.031758229), (3.260416667, -2.031758229))
        make_face()
        Polygon((2.485026042, -3.156758229), (3.221354167, -3.156758229), (2.861979167, -4.612487396), (2.829427083, -4.604674896), align=None, mode=Mode.SUBTRACT)
    extrude(amount=WRAP_1_DEPTH, mode=Mode.SUBTRACT)


solid = part.part
